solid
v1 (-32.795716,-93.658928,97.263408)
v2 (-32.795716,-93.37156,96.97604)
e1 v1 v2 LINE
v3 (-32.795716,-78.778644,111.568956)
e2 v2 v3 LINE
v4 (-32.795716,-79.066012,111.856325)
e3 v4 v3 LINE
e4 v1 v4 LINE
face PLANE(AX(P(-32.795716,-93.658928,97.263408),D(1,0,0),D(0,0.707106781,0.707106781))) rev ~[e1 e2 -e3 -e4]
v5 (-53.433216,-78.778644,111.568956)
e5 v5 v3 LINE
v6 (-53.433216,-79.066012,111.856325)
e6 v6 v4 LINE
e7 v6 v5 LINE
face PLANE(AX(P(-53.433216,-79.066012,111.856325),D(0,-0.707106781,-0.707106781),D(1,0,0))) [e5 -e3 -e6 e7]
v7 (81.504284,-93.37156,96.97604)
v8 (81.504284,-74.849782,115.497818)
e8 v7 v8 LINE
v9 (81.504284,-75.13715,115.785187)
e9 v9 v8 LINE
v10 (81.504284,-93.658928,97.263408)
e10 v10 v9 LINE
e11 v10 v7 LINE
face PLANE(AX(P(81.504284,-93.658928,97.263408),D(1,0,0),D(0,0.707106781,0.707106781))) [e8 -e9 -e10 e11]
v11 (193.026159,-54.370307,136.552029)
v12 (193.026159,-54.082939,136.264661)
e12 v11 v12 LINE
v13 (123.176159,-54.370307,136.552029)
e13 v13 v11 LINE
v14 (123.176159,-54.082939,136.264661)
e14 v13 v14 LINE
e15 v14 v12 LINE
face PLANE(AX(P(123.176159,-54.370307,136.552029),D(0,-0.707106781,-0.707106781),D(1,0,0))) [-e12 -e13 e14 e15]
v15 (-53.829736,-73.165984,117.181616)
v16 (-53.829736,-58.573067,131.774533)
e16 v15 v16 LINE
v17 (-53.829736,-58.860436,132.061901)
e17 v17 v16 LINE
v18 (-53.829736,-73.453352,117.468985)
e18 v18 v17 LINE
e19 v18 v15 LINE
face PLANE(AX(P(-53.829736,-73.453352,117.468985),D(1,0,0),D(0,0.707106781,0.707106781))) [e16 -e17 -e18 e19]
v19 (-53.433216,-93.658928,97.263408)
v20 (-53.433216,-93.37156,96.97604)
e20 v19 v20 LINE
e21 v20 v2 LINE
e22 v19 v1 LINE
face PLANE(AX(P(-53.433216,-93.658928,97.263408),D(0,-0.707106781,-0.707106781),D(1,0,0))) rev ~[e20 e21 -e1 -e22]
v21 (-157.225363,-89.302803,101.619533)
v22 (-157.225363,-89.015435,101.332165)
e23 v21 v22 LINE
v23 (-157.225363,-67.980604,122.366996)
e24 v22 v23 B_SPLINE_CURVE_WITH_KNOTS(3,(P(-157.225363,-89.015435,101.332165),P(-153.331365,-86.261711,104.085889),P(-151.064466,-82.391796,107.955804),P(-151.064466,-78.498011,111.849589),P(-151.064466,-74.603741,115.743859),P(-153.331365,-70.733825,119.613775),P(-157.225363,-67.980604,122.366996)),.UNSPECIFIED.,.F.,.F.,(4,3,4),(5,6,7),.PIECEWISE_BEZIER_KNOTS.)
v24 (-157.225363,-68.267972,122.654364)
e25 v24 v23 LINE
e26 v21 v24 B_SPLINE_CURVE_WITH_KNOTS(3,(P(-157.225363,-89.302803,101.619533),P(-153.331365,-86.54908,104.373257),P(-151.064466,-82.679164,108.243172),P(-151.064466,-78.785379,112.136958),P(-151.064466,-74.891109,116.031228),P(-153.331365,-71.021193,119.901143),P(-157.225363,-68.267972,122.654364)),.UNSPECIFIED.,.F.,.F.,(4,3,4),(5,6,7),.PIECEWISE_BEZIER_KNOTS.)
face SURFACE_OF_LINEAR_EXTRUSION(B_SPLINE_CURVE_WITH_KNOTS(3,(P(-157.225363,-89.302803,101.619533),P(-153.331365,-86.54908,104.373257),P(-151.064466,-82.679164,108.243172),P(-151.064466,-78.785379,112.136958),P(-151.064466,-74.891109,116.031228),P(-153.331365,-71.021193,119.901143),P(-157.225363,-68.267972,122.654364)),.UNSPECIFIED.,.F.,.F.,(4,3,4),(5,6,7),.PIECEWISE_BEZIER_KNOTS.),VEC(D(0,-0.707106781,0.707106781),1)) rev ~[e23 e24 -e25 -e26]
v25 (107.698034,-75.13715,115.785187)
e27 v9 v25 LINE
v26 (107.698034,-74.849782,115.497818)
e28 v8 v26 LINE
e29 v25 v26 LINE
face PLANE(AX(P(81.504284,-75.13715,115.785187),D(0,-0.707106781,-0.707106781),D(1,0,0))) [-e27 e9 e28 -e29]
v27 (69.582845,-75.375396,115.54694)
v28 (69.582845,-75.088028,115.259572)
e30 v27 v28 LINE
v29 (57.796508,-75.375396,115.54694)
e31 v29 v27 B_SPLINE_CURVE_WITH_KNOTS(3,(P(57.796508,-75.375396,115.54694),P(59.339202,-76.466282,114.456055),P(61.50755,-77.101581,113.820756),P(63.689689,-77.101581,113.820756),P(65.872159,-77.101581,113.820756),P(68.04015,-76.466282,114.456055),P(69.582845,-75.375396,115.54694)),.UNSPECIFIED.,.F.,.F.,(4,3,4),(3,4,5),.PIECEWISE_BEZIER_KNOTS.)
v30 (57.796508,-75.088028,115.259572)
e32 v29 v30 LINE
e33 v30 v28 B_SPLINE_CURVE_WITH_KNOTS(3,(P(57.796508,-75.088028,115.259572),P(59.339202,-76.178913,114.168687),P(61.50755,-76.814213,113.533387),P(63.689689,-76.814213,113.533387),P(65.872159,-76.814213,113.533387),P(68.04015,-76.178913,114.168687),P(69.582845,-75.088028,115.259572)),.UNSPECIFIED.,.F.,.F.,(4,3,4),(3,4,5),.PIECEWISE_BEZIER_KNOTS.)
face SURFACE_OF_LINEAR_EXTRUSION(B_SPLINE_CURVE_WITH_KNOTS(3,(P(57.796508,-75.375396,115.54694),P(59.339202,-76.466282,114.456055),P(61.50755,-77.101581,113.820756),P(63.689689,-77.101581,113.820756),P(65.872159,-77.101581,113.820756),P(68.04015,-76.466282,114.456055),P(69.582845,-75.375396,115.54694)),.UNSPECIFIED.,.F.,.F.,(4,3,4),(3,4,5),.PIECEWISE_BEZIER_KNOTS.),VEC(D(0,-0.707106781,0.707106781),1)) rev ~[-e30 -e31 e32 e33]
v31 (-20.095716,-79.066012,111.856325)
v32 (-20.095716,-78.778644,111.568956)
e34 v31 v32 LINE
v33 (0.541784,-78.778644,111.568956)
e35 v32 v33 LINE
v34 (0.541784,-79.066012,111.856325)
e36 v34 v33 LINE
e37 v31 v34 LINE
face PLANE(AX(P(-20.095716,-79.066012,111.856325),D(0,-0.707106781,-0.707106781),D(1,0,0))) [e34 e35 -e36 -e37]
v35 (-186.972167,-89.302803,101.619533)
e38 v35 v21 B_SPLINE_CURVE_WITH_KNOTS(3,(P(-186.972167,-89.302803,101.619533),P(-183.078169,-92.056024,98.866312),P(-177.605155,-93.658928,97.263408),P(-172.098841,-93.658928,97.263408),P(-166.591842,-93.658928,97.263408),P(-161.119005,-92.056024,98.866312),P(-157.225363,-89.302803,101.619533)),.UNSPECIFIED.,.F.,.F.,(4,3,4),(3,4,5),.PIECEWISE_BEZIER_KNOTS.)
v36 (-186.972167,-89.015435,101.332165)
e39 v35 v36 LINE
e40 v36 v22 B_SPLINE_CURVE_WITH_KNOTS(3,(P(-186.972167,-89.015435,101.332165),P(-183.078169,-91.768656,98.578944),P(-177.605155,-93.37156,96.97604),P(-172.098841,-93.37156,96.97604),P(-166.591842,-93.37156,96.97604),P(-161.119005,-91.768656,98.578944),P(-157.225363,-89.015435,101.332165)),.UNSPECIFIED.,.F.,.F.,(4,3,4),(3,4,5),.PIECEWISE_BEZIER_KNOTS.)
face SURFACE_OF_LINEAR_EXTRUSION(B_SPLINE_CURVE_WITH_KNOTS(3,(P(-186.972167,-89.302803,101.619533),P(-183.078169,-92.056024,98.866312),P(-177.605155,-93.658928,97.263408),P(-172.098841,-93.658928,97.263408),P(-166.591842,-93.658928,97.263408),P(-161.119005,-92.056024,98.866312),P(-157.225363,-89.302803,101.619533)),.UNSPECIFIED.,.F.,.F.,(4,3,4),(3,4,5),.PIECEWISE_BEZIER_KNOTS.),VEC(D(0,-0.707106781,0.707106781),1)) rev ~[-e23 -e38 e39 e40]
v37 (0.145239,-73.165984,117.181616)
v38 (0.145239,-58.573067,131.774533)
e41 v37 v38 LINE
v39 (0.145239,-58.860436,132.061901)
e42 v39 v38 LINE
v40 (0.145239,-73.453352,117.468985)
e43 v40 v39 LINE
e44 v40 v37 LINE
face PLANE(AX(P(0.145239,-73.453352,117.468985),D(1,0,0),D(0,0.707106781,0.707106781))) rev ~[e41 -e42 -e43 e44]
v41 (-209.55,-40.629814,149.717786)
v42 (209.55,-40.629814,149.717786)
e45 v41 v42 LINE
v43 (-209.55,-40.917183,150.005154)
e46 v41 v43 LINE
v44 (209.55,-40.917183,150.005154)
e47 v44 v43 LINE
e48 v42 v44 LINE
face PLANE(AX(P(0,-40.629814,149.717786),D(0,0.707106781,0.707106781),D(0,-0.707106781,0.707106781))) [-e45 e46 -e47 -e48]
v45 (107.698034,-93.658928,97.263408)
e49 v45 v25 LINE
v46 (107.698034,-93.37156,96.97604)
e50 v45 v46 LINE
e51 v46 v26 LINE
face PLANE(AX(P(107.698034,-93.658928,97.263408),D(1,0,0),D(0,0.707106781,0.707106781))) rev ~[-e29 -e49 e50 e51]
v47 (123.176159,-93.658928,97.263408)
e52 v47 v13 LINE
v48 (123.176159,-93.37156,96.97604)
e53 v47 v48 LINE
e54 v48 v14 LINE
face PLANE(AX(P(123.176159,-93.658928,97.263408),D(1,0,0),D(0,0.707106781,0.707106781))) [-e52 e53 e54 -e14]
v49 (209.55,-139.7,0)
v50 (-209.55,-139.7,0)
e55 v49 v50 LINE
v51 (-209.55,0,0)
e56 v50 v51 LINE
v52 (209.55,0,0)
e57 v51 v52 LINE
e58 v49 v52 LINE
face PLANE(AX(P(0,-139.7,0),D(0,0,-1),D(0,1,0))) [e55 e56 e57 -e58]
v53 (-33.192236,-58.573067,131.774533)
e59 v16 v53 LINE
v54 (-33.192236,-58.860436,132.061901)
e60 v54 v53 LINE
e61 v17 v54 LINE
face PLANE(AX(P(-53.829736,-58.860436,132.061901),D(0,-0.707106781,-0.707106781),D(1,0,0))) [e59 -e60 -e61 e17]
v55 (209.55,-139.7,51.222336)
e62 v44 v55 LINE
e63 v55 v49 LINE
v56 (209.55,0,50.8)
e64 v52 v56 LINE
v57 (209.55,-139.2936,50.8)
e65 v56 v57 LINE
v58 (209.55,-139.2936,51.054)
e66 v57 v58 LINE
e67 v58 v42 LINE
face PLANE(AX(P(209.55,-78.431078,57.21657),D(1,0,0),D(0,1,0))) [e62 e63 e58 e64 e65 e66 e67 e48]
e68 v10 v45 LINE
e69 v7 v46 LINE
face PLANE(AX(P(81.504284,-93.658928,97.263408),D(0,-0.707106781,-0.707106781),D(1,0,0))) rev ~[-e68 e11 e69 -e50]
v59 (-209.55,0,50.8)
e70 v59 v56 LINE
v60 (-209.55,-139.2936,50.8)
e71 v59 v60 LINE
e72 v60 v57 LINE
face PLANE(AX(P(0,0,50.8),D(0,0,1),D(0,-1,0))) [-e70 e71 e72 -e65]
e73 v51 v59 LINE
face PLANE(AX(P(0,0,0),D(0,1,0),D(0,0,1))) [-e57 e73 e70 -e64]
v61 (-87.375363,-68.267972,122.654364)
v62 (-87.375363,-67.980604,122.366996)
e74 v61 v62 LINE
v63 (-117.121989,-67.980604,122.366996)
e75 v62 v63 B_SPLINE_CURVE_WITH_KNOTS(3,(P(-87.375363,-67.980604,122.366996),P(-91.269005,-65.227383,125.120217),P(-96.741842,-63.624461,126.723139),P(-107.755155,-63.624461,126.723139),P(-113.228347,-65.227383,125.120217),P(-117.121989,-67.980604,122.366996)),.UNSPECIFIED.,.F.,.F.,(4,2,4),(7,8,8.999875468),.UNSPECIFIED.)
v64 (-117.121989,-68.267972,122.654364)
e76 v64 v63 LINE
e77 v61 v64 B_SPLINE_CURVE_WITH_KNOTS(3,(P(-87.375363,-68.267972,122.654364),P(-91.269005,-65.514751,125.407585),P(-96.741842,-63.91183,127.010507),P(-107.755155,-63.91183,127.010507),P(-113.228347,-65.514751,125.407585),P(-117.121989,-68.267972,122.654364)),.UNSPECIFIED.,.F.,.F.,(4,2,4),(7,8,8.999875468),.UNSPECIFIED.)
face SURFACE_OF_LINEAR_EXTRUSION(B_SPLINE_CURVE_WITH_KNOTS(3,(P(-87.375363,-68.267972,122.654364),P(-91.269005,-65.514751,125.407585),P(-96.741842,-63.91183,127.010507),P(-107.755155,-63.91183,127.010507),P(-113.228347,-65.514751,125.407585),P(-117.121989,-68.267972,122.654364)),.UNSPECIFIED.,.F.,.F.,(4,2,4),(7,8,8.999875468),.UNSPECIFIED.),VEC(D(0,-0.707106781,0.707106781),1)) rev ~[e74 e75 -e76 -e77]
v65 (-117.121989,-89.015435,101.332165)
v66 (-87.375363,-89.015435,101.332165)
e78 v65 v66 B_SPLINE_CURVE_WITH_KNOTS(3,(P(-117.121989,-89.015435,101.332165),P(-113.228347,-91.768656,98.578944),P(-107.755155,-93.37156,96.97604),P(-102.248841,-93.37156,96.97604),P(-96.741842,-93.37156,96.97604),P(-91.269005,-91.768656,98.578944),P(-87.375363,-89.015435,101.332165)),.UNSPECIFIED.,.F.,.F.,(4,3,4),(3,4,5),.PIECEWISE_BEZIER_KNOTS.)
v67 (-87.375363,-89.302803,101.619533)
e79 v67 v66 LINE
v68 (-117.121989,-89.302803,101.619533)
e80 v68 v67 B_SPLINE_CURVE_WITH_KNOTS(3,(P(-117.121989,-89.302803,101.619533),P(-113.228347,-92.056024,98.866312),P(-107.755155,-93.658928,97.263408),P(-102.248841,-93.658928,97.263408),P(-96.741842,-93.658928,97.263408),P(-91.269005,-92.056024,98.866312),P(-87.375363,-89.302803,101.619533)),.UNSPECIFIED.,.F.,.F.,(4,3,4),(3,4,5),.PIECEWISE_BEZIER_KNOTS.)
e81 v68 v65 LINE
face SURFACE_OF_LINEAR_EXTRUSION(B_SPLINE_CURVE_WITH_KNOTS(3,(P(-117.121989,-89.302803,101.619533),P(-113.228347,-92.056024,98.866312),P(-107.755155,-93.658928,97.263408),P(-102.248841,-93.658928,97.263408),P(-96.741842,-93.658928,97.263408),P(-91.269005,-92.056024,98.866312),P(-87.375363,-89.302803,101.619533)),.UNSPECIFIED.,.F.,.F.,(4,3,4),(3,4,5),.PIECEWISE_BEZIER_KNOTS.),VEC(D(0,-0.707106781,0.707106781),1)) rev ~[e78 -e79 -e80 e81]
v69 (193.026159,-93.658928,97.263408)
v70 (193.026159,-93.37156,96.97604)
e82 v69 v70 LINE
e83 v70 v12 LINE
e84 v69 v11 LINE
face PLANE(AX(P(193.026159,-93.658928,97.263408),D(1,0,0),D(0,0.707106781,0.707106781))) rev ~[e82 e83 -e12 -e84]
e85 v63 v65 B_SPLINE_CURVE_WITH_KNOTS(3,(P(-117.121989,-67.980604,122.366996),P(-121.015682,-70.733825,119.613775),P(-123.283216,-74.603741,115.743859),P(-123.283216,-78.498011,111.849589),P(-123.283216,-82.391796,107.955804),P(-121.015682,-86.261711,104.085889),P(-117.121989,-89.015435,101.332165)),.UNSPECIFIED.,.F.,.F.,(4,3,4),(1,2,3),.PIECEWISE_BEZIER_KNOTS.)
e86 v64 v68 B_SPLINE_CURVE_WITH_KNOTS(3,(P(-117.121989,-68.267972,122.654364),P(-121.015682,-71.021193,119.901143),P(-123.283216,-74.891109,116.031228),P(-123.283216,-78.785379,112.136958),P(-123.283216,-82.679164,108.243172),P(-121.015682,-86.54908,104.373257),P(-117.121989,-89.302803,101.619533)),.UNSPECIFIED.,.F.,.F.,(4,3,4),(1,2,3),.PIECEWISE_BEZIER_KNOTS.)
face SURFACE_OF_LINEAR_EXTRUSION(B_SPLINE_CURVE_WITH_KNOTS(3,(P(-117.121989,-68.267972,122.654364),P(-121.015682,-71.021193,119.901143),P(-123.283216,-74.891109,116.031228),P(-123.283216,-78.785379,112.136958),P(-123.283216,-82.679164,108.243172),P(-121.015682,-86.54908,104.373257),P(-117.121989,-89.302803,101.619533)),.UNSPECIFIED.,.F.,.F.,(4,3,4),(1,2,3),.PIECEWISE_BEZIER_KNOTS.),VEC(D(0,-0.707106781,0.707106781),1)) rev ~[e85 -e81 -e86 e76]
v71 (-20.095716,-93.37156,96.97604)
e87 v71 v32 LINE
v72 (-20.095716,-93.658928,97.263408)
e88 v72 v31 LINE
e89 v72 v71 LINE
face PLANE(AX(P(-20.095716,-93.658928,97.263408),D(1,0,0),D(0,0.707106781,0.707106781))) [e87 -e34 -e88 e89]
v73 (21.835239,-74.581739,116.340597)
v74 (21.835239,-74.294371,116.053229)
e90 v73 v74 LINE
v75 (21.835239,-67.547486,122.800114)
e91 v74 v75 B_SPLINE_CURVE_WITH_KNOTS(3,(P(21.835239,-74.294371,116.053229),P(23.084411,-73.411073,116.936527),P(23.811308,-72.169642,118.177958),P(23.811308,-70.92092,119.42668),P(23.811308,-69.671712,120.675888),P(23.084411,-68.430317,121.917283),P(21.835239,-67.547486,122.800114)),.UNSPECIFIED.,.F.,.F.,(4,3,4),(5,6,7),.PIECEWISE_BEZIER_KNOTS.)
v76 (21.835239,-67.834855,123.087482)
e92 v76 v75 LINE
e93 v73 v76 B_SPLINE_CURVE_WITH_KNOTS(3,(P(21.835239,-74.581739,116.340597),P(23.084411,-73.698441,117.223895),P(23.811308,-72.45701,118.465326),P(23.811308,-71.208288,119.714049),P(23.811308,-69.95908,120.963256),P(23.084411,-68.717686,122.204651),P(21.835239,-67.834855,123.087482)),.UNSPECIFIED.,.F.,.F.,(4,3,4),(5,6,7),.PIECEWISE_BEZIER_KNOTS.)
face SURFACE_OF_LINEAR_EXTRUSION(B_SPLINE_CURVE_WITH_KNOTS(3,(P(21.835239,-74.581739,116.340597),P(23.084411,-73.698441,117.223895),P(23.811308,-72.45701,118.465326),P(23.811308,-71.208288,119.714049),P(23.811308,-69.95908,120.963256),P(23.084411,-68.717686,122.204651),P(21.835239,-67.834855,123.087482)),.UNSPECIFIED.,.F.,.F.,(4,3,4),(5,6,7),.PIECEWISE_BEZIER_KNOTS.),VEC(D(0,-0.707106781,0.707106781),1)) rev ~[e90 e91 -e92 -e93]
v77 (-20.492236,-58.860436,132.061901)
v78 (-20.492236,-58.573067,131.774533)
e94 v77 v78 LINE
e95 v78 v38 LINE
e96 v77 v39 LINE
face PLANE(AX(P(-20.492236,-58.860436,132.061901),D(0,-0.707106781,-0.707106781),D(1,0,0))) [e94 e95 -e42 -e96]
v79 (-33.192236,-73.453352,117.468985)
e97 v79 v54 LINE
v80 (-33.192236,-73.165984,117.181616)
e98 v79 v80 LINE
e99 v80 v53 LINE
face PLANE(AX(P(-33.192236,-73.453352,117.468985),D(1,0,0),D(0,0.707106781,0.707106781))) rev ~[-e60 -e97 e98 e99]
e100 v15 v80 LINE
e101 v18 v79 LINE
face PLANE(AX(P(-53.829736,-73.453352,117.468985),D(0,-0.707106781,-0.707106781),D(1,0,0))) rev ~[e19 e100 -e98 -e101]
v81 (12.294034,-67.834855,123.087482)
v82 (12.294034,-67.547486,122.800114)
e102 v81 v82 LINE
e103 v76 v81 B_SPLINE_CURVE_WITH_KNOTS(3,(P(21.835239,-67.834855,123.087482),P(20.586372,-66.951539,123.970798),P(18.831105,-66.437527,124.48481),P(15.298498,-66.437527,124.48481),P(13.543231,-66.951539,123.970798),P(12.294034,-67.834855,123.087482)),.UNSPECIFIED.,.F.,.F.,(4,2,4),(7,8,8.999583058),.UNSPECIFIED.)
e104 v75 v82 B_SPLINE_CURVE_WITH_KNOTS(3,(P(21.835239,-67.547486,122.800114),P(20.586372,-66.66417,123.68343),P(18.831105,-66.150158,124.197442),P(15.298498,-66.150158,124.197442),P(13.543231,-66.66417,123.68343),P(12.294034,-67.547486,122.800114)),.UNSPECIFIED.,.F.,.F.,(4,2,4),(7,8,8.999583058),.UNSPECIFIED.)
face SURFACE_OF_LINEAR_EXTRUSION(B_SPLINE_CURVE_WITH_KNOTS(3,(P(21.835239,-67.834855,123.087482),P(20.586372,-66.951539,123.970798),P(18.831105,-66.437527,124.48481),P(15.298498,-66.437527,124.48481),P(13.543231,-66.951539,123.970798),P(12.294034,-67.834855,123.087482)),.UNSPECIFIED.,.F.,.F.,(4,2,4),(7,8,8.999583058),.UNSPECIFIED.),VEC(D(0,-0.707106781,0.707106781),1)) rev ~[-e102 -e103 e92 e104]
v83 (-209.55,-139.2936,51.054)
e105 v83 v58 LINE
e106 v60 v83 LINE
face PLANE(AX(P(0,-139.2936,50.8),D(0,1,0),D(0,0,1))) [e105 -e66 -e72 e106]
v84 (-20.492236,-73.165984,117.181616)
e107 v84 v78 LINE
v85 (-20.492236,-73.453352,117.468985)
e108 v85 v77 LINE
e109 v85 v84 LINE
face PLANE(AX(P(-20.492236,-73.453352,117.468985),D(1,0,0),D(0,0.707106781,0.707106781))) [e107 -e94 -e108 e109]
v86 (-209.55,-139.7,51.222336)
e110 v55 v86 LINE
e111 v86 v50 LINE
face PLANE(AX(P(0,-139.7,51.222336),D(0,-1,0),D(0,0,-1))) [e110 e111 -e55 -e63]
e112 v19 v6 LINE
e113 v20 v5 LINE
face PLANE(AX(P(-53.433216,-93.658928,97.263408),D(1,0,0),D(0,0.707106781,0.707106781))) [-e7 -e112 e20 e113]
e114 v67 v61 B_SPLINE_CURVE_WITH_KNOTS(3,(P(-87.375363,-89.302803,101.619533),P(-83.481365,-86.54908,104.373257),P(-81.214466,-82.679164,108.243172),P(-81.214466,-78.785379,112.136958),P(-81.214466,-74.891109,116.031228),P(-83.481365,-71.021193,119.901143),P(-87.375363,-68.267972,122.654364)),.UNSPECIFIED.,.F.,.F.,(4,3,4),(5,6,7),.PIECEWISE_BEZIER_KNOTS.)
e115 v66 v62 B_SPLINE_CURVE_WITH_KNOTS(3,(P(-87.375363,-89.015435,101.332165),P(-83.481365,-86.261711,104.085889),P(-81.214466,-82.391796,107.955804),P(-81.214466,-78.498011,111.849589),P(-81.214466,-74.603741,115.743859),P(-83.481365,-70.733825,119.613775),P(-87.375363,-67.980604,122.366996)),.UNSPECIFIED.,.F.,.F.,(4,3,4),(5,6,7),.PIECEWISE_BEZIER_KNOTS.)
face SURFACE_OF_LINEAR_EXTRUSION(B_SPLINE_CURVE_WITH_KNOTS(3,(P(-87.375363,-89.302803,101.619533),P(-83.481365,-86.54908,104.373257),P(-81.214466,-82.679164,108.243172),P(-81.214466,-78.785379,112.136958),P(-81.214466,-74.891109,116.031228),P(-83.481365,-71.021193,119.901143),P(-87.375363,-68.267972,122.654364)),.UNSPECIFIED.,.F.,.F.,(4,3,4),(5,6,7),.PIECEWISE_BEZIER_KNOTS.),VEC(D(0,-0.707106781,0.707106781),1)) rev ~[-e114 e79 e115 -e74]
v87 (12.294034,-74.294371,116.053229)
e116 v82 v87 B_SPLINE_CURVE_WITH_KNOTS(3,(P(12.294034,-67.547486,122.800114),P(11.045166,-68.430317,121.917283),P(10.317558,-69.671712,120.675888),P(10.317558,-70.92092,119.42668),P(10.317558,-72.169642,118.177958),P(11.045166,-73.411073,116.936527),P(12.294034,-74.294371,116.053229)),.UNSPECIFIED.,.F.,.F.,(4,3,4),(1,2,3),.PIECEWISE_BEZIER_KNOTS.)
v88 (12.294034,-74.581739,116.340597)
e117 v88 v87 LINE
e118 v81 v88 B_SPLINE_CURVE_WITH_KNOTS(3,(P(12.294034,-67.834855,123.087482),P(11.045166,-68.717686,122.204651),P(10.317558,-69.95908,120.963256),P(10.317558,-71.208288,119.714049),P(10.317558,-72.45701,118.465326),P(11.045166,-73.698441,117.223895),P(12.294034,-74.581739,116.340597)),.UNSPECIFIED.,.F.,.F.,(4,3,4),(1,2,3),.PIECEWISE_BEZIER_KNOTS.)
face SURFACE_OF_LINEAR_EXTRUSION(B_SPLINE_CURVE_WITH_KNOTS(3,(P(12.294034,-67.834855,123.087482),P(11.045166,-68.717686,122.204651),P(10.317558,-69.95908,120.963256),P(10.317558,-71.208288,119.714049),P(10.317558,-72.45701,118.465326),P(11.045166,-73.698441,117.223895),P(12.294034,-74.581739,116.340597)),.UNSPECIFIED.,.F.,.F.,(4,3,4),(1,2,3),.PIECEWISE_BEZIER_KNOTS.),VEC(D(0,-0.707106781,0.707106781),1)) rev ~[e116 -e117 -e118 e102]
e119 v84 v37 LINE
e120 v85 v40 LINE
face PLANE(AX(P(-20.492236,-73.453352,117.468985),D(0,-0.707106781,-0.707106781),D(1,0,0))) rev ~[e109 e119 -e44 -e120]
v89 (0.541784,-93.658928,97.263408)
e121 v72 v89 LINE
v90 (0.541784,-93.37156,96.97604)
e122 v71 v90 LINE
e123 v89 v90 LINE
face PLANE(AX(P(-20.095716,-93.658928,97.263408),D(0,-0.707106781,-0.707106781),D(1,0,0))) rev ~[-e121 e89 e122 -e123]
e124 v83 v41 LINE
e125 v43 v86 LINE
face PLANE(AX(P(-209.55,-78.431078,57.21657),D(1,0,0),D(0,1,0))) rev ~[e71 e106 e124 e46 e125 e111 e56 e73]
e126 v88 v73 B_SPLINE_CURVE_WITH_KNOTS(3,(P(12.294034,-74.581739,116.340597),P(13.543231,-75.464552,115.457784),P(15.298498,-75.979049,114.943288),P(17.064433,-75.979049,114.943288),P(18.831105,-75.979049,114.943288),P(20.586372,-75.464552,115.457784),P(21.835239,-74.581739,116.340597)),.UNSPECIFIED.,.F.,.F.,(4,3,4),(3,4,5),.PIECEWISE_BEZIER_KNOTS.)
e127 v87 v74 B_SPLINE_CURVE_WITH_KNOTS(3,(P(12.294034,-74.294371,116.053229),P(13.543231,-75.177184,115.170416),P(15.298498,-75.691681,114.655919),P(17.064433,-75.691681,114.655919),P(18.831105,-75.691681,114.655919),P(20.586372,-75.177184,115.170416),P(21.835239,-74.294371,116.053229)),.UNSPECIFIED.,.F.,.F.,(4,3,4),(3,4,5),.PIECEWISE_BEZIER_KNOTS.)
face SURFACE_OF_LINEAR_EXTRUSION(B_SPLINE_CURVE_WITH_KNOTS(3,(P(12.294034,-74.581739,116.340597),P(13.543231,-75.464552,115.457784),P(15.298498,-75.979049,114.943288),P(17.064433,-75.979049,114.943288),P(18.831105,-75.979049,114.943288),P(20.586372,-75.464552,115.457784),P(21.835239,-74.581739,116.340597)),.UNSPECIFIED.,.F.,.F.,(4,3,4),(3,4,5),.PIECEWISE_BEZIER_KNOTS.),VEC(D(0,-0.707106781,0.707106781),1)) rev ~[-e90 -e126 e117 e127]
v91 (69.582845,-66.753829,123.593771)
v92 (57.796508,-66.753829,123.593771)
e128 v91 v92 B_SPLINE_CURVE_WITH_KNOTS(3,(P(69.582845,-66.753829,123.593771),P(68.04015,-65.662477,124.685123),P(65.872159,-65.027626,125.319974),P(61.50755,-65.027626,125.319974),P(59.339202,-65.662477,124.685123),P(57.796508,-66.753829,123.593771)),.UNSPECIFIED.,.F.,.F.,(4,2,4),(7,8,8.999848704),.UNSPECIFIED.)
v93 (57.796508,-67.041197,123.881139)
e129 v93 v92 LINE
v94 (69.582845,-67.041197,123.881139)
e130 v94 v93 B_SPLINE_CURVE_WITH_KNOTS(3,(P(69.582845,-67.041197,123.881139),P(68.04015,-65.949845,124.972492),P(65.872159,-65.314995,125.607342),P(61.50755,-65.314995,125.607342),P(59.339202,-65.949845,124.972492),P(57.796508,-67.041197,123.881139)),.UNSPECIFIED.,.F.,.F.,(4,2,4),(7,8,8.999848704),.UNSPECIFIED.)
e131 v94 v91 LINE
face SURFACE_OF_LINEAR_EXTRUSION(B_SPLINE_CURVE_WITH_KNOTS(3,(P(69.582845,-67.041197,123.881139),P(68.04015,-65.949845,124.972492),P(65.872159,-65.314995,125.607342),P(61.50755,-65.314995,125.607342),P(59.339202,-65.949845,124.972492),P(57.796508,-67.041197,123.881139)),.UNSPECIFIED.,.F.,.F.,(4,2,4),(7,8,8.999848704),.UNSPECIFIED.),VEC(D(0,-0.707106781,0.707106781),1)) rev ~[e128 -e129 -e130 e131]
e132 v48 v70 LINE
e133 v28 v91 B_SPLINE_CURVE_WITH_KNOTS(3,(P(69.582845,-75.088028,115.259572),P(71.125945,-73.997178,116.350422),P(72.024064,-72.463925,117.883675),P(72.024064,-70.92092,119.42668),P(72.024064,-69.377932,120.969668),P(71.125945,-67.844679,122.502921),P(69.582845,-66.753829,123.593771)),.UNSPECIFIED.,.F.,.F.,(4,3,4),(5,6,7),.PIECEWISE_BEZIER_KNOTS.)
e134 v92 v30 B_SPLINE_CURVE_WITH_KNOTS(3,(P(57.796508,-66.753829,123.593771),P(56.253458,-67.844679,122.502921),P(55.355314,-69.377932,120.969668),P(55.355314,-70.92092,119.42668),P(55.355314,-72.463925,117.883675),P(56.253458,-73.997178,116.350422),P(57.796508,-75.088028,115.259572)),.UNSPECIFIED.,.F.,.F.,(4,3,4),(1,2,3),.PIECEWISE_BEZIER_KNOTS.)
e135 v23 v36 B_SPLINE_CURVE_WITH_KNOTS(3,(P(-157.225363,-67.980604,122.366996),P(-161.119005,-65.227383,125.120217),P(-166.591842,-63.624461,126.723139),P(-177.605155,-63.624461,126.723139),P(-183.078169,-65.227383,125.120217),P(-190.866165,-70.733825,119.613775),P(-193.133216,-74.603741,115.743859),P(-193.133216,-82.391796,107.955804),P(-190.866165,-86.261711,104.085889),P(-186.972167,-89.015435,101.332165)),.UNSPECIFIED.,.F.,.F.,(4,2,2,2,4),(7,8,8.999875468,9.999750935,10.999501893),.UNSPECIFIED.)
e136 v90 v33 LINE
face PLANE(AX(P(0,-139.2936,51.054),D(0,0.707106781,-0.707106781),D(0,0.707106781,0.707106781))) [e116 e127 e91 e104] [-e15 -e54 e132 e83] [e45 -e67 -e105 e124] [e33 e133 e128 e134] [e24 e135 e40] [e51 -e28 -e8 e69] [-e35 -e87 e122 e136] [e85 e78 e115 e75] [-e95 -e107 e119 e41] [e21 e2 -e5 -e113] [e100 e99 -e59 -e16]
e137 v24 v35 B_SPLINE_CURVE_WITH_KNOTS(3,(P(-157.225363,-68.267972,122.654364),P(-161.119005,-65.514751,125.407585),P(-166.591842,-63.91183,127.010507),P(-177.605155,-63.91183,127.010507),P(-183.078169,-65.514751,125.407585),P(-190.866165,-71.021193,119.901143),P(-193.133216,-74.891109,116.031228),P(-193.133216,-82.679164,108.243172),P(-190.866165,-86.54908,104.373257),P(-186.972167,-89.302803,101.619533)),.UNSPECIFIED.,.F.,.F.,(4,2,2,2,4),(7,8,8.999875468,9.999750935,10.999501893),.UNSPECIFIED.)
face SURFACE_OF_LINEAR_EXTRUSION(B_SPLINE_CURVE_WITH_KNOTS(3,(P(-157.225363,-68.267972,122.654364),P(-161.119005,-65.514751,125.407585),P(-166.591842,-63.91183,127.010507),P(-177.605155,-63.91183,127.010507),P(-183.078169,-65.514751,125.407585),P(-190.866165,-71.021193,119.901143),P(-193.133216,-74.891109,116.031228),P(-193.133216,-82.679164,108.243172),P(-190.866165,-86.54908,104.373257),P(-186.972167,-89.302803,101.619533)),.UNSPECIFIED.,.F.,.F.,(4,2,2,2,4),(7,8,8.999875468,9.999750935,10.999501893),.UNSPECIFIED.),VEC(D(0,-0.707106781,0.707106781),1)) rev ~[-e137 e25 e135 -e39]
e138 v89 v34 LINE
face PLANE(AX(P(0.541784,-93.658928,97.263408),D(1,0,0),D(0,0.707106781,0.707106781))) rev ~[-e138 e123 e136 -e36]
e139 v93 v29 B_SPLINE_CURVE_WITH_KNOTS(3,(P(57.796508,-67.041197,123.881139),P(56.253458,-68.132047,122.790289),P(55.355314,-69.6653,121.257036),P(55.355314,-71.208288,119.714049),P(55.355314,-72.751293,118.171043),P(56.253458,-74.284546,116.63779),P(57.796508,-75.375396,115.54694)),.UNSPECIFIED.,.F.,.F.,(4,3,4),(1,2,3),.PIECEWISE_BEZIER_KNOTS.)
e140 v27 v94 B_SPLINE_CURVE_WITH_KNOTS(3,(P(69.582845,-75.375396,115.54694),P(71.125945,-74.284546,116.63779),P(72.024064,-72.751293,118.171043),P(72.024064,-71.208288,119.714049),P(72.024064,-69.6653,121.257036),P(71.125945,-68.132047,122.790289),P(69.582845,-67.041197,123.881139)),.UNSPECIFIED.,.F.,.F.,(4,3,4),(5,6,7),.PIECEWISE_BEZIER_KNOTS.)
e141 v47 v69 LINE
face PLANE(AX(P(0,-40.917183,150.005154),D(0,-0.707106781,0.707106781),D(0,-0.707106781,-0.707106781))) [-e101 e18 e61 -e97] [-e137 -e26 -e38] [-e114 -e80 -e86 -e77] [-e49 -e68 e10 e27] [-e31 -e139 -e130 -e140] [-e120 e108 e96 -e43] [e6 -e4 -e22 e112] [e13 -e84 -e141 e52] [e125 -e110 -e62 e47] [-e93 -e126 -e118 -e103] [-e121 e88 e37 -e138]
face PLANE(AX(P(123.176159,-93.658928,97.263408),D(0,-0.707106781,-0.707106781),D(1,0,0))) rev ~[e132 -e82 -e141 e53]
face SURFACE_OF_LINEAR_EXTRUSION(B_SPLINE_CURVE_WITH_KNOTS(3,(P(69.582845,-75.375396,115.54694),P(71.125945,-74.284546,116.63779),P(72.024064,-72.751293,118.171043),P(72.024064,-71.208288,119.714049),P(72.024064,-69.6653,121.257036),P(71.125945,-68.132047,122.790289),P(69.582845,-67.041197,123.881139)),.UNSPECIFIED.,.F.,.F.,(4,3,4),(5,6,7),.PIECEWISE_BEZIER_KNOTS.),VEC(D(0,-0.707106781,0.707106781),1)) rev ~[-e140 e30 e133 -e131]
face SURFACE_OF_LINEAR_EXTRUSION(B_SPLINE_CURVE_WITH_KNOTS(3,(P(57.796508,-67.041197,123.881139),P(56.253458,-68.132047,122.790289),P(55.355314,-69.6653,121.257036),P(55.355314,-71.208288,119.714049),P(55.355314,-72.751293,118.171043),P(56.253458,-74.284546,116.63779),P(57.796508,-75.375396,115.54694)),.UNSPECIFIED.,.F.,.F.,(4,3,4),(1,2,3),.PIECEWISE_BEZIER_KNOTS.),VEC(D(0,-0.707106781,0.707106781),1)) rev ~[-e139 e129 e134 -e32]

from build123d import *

# Parameters (mm, degrees)
F1_DEPTH = 209.55
F2_W     = 20.6375
F2_H     = 20.6375
F2_W_2   = 20.6374746
F2_W_3   = 69.85
F2_H_2   = 55.5625
F2_W_4   = 26.19375
F2_H_3   = 26.19375
F3_DEPTH = 0.4064


# Not quite as in the source:
# - the dataset's text gives a spline's control points without its knots; the knots are read off the source's solid


with BuildPart() as f1:
    # F0 (on Right) → F1 (new body, symmetric)
    with BuildSketch(Plane.YZ):
        Polygon((-139.7, 0), (0, 0), (0, 50.8), (-139.2936, 50.8), (-139.2936, 51.054), (-40.6298144724, 149.7177855276), (-40.9171826682, 150.0051537235), (-139.7, 51.2223363917), align=None)
    extrude(amount=F1_DEPTH, both=True)

    # F2 (on face) → F3 (cut, through all)
    with BuildSketch(Plane(origin=(0, -95.4611681959, 95.4611681959), x_dir=(1, 0, 0), z_dir=(0, -0.7071067812, 0.7071067812))):
        with Locations((-43.1144662619, 12.8675024964)):
            Rectangle(F2_W, F2_H)
        with Locations((-43.5109856619, 41.4425024964)):
            Rectangle(F2_W, F2_H)
        with Locations((-9.7769662619, 12.8675024964)):
            Rectangle(F2_W, F2_H)
        with Locations((-10.1734983619, 41.4425024964)):
            Rectangle(F2_W_2, F2_H)
        with Locations((158.1011587381, 30.3300024964)):
            Rectangle(F2_W_3, F2_H_2)
        with Locations((94.6011587381, 15.6456274964)):
            Rectangle(F2_W_4, F2_H_3)
        with BuildLine():
            add(Edge.make_bspline(
                [(21.8352387381, 39.0695074964), (20.5863715381, 40.3187048964), (18.8311045381, 41.0456274964), (17.0644329381, 41.0456274964)],
                knots=[7, 7, 7, 7, 8, 8, 8, 8], degree=3))
            add(Edge.make_bspline(
                [(17.0644329381, 41.0456274964), (15.2984979381, 41.0456274964), (13.5432309381, 40.3187048964), (12.2940335381, 39.0695074964)],
                knots=[0, 0, 0, 0, 1, 1, 1, 1], degree=3))
            add(Edge.make_bspline(
                [(12.2940335381, 39.0695074964), (11.0451663381, 37.8209958964), (10.3175579381, 36.0653986964), (10.3175579381, 34.2987524964), (10.3175579381, 32.5327920964), (11.0451663381, 30.7771440964), (12.2940335381, 29.5279720964)],
                knots=[1, 1, 1, 1, 2, 2, 2, 3, 3, 3, 3], degree=3))
            add(Edge.make_bspline(
                [(12.2940335381, 29.5279720964), (13.5432309381, 28.2794858964), (15.2984979381, 27.5518774964), (17.0644329381, 27.5518774964), (18.8311045381, 27.5518774964), (20.5863715381, 28.2794858964), (21.8352387381, 29.5279720964)],
                knots=[3, 3, 3, 3, 4, 4, 4, 5, 5, 5, 5], degree=3))
            add(Edge.make_bspline(
                [(21.8352387381, 29.5279720964), (23.0844107381, 30.7771440964), (23.8113079381, 32.5327920964), (23.8113079381, 34.2987524964), (23.8113079381, 36.0653986964), (23.0844107381, 37.8209958964), (21.8352387381, 39.0695074964)],
                knots=[5, 5, 5, 5, 6, 6, 6, 7, 7, 7, 7], degree=3))
        make_face()
        with BuildLine():
            add(Edge.make_bspline(
                [(-87.3753632619, 38.4569864964), (-91.2690054619, 42.3506286964), (-96.7418418619, 44.6175024964), (-102.2488412619, 44.6175024964)],
                knots=[7, 7, 7, 7, 8, 8, 8, 8], degree=3))
            add(Edge.make_bspline(
                [(-102.2488412619, 44.6175024964), (-107.7551548619, 44.6175024964), (-113.2283468619, 42.3506286964), (-117.1219890619, 38.4569864964)],
                knots=[0, 0, 0, 0, 1, 1, 1, 1], degree=3))
            add(Edge.make_bspline(
                [(-117.1219890619, 38.4569864964), (-121.0156820619, 34.5633442964), (-123.2832162619, 29.0904570964), (-123.2832162619, 23.5831274964), (-123.2832162619, 18.0764836964), (-121.0156820619, 12.6035964964), (-117.1219890619, 8.7092430964)],
                knots=[1, 1, 1, 1, 2, 2, 2, 3, 3, 3, 3], degree=3))
            add(Edge.make_bspline(
                [(-117.1219890619, 8.7092430964), (-113.2283468619, 4.8156008964), (-107.7551548619, 2.5487524964), (-102.2488412619, 2.5487524964), (-96.7418418619, 2.5487524964), (-91.2690054619, 4.8156008964), (-87.3753632619, 8.7092430964)],
                knots=[3, 3, 3, 3, 4, 4, 4, 5, 5, 5, 5], degree=3))
            add(Edge.make_bspline(
                [(-87.3753632619, 8.7092430964), (-83.4813654619, 12.6035964964), (-81.2144662619, 18.0764836964), (-81.2144662619, 23.5831274964), (-81.2144662619, 29.0904570964), (-83.4813654619, 34.5633442964), (-87.3753632619, 38.4569864964)],
                knots=[5, 5, 5, 5, 6, 6, 6, 7, 7, 7, 7], degree=3))
        make_face()
        with BuildLine():
            add(Edge.make_bspline(
                [(-157.2253632619, 38.4569864964), (-161.1190054619, 42.3506286964), (-166.5918418619, 44.6175024964), (-172.0988412619, 44.6175024964)],
                knots=[7, 7, 7, 7, 8, 8, 8, 8], degree=3))
            add(Edge.make_bspline(
                [(-172.0988412619, 44.6175024964), (-177.6051548619, 44.6175024964), (-183.0781690619, 42.3506286964), (-186.9721668619, 38.4569864964), (-190.8661646619, 34.5633442964), (-193.1332162619, 29.0904570964), (-193.1332162619, 23.5831274964), (-193.1332162619, 18.0764836964), (-190.8661646619, 12.6035964964), (-186.9721668619, 8.7092430964)],
                knots=[0, 0, 0, 0, 1, 1, 1, 2, 2, 2, 3, 3, 3, 3], degree=3))
            add(Edge.make_bspline(
                [(-186.9721668619, 8.7092430964), (-183.0781690619, 4.8156008964), (-177.6051548619, 2.5487524964), (-172.0988412619, 2.5487524964), (-166.5918418619, 2.5487524964), (-161.1190054619, 4.8156008964), (-157.2253632619, 8.7092430964)],
                knots=[3, 3, 3, 3, 4, 4, 4, 5, 5, 5, 5], degree=3))
            add(Edge.make_bspline(
                [(-157.2253632619, 8.7092430964), (-153.3313654619, 12.6035964964), (-151.0644662619, 18.0764836964), (-151.0644662619, 23.5831274964), (-151.0644662619, 29.0904570964), (-153.3313654619, 34.5633442964), (-157.2253632619, 38.4569864964)],
                knots=[5, 5, 5, 5, 6, 6, 6, 7, 7, 7, 7], degree=3))
        make_face()
        with BuildLine():
            add(Edge.make_bspline(
                [(69.5828445381, 40.1919080964), (68.0401501381, 41.7353136964), (65.8721585381, 42.6331274964), (63.6896889381, 42.6331274964)],
                knots=[7, 7, 7, 7, 8, 8, 8, 8], degree=3))
            add(Edge.make_bspline(
                [(63.6896889381, 42.6331274964), (61.5075495381, 42.6331274964), (59.3392023381, 41.7353136964), (57.7965079381, 40.1919080964)],
                knots=[0, 0, 0, 0, 1, 1, 1, 1], degree=3))
            add(Edge.make_bspline(
                [(57.7965079381, 40.1919080964), (56.2534579381, 38.6492136964), (55.3553139381, 36.4808664964), (55.3553139381, 34.2987524964), (55.3553139381, 32.1166130964), (56.2534579381, 29.9482658964), (57.7965079381, 28.4055714964)],
                knots=[1, 1, 1, 1, 2, 2, 2, 3, 3, 3, 3], degree=3))
            add(Edge.make_bspline(
                [(57.7965079381, 28.4055714964), (59.3392023381, 26.8628262964), (61.5075495381, 25.9643774964), (63.6896889381, 25.9643774964), (65.8721585381, 25.9643774964), (68.0401501381, 26.8628262964), (69.5828445381, 28.4055714964)],
                knots=[3, 3, 3, 3, 4, 4, 4, 5, 5, 5, 5], degree=3))
            add(Edge.make_bspline(
                [(69.5828445381, 28.4055714964), (71.1259453381, 29.9482658964), (72.0240639381, 32.1166130964), (72.0240639381, 34.2987524964), (72.0240639381, 36.4808664964), (71.1259453381, 38.6492136964), (69.5828445381, 40.1919080964)],
                knots=[5, 5, 5, 5, 6, 6, 6, 7, 7, 7, 7], degree=3))
        make_face()
    extrude(amount=-F3_DEPTH, mode=Mode.SUBTRACT)


solid = f1.part
